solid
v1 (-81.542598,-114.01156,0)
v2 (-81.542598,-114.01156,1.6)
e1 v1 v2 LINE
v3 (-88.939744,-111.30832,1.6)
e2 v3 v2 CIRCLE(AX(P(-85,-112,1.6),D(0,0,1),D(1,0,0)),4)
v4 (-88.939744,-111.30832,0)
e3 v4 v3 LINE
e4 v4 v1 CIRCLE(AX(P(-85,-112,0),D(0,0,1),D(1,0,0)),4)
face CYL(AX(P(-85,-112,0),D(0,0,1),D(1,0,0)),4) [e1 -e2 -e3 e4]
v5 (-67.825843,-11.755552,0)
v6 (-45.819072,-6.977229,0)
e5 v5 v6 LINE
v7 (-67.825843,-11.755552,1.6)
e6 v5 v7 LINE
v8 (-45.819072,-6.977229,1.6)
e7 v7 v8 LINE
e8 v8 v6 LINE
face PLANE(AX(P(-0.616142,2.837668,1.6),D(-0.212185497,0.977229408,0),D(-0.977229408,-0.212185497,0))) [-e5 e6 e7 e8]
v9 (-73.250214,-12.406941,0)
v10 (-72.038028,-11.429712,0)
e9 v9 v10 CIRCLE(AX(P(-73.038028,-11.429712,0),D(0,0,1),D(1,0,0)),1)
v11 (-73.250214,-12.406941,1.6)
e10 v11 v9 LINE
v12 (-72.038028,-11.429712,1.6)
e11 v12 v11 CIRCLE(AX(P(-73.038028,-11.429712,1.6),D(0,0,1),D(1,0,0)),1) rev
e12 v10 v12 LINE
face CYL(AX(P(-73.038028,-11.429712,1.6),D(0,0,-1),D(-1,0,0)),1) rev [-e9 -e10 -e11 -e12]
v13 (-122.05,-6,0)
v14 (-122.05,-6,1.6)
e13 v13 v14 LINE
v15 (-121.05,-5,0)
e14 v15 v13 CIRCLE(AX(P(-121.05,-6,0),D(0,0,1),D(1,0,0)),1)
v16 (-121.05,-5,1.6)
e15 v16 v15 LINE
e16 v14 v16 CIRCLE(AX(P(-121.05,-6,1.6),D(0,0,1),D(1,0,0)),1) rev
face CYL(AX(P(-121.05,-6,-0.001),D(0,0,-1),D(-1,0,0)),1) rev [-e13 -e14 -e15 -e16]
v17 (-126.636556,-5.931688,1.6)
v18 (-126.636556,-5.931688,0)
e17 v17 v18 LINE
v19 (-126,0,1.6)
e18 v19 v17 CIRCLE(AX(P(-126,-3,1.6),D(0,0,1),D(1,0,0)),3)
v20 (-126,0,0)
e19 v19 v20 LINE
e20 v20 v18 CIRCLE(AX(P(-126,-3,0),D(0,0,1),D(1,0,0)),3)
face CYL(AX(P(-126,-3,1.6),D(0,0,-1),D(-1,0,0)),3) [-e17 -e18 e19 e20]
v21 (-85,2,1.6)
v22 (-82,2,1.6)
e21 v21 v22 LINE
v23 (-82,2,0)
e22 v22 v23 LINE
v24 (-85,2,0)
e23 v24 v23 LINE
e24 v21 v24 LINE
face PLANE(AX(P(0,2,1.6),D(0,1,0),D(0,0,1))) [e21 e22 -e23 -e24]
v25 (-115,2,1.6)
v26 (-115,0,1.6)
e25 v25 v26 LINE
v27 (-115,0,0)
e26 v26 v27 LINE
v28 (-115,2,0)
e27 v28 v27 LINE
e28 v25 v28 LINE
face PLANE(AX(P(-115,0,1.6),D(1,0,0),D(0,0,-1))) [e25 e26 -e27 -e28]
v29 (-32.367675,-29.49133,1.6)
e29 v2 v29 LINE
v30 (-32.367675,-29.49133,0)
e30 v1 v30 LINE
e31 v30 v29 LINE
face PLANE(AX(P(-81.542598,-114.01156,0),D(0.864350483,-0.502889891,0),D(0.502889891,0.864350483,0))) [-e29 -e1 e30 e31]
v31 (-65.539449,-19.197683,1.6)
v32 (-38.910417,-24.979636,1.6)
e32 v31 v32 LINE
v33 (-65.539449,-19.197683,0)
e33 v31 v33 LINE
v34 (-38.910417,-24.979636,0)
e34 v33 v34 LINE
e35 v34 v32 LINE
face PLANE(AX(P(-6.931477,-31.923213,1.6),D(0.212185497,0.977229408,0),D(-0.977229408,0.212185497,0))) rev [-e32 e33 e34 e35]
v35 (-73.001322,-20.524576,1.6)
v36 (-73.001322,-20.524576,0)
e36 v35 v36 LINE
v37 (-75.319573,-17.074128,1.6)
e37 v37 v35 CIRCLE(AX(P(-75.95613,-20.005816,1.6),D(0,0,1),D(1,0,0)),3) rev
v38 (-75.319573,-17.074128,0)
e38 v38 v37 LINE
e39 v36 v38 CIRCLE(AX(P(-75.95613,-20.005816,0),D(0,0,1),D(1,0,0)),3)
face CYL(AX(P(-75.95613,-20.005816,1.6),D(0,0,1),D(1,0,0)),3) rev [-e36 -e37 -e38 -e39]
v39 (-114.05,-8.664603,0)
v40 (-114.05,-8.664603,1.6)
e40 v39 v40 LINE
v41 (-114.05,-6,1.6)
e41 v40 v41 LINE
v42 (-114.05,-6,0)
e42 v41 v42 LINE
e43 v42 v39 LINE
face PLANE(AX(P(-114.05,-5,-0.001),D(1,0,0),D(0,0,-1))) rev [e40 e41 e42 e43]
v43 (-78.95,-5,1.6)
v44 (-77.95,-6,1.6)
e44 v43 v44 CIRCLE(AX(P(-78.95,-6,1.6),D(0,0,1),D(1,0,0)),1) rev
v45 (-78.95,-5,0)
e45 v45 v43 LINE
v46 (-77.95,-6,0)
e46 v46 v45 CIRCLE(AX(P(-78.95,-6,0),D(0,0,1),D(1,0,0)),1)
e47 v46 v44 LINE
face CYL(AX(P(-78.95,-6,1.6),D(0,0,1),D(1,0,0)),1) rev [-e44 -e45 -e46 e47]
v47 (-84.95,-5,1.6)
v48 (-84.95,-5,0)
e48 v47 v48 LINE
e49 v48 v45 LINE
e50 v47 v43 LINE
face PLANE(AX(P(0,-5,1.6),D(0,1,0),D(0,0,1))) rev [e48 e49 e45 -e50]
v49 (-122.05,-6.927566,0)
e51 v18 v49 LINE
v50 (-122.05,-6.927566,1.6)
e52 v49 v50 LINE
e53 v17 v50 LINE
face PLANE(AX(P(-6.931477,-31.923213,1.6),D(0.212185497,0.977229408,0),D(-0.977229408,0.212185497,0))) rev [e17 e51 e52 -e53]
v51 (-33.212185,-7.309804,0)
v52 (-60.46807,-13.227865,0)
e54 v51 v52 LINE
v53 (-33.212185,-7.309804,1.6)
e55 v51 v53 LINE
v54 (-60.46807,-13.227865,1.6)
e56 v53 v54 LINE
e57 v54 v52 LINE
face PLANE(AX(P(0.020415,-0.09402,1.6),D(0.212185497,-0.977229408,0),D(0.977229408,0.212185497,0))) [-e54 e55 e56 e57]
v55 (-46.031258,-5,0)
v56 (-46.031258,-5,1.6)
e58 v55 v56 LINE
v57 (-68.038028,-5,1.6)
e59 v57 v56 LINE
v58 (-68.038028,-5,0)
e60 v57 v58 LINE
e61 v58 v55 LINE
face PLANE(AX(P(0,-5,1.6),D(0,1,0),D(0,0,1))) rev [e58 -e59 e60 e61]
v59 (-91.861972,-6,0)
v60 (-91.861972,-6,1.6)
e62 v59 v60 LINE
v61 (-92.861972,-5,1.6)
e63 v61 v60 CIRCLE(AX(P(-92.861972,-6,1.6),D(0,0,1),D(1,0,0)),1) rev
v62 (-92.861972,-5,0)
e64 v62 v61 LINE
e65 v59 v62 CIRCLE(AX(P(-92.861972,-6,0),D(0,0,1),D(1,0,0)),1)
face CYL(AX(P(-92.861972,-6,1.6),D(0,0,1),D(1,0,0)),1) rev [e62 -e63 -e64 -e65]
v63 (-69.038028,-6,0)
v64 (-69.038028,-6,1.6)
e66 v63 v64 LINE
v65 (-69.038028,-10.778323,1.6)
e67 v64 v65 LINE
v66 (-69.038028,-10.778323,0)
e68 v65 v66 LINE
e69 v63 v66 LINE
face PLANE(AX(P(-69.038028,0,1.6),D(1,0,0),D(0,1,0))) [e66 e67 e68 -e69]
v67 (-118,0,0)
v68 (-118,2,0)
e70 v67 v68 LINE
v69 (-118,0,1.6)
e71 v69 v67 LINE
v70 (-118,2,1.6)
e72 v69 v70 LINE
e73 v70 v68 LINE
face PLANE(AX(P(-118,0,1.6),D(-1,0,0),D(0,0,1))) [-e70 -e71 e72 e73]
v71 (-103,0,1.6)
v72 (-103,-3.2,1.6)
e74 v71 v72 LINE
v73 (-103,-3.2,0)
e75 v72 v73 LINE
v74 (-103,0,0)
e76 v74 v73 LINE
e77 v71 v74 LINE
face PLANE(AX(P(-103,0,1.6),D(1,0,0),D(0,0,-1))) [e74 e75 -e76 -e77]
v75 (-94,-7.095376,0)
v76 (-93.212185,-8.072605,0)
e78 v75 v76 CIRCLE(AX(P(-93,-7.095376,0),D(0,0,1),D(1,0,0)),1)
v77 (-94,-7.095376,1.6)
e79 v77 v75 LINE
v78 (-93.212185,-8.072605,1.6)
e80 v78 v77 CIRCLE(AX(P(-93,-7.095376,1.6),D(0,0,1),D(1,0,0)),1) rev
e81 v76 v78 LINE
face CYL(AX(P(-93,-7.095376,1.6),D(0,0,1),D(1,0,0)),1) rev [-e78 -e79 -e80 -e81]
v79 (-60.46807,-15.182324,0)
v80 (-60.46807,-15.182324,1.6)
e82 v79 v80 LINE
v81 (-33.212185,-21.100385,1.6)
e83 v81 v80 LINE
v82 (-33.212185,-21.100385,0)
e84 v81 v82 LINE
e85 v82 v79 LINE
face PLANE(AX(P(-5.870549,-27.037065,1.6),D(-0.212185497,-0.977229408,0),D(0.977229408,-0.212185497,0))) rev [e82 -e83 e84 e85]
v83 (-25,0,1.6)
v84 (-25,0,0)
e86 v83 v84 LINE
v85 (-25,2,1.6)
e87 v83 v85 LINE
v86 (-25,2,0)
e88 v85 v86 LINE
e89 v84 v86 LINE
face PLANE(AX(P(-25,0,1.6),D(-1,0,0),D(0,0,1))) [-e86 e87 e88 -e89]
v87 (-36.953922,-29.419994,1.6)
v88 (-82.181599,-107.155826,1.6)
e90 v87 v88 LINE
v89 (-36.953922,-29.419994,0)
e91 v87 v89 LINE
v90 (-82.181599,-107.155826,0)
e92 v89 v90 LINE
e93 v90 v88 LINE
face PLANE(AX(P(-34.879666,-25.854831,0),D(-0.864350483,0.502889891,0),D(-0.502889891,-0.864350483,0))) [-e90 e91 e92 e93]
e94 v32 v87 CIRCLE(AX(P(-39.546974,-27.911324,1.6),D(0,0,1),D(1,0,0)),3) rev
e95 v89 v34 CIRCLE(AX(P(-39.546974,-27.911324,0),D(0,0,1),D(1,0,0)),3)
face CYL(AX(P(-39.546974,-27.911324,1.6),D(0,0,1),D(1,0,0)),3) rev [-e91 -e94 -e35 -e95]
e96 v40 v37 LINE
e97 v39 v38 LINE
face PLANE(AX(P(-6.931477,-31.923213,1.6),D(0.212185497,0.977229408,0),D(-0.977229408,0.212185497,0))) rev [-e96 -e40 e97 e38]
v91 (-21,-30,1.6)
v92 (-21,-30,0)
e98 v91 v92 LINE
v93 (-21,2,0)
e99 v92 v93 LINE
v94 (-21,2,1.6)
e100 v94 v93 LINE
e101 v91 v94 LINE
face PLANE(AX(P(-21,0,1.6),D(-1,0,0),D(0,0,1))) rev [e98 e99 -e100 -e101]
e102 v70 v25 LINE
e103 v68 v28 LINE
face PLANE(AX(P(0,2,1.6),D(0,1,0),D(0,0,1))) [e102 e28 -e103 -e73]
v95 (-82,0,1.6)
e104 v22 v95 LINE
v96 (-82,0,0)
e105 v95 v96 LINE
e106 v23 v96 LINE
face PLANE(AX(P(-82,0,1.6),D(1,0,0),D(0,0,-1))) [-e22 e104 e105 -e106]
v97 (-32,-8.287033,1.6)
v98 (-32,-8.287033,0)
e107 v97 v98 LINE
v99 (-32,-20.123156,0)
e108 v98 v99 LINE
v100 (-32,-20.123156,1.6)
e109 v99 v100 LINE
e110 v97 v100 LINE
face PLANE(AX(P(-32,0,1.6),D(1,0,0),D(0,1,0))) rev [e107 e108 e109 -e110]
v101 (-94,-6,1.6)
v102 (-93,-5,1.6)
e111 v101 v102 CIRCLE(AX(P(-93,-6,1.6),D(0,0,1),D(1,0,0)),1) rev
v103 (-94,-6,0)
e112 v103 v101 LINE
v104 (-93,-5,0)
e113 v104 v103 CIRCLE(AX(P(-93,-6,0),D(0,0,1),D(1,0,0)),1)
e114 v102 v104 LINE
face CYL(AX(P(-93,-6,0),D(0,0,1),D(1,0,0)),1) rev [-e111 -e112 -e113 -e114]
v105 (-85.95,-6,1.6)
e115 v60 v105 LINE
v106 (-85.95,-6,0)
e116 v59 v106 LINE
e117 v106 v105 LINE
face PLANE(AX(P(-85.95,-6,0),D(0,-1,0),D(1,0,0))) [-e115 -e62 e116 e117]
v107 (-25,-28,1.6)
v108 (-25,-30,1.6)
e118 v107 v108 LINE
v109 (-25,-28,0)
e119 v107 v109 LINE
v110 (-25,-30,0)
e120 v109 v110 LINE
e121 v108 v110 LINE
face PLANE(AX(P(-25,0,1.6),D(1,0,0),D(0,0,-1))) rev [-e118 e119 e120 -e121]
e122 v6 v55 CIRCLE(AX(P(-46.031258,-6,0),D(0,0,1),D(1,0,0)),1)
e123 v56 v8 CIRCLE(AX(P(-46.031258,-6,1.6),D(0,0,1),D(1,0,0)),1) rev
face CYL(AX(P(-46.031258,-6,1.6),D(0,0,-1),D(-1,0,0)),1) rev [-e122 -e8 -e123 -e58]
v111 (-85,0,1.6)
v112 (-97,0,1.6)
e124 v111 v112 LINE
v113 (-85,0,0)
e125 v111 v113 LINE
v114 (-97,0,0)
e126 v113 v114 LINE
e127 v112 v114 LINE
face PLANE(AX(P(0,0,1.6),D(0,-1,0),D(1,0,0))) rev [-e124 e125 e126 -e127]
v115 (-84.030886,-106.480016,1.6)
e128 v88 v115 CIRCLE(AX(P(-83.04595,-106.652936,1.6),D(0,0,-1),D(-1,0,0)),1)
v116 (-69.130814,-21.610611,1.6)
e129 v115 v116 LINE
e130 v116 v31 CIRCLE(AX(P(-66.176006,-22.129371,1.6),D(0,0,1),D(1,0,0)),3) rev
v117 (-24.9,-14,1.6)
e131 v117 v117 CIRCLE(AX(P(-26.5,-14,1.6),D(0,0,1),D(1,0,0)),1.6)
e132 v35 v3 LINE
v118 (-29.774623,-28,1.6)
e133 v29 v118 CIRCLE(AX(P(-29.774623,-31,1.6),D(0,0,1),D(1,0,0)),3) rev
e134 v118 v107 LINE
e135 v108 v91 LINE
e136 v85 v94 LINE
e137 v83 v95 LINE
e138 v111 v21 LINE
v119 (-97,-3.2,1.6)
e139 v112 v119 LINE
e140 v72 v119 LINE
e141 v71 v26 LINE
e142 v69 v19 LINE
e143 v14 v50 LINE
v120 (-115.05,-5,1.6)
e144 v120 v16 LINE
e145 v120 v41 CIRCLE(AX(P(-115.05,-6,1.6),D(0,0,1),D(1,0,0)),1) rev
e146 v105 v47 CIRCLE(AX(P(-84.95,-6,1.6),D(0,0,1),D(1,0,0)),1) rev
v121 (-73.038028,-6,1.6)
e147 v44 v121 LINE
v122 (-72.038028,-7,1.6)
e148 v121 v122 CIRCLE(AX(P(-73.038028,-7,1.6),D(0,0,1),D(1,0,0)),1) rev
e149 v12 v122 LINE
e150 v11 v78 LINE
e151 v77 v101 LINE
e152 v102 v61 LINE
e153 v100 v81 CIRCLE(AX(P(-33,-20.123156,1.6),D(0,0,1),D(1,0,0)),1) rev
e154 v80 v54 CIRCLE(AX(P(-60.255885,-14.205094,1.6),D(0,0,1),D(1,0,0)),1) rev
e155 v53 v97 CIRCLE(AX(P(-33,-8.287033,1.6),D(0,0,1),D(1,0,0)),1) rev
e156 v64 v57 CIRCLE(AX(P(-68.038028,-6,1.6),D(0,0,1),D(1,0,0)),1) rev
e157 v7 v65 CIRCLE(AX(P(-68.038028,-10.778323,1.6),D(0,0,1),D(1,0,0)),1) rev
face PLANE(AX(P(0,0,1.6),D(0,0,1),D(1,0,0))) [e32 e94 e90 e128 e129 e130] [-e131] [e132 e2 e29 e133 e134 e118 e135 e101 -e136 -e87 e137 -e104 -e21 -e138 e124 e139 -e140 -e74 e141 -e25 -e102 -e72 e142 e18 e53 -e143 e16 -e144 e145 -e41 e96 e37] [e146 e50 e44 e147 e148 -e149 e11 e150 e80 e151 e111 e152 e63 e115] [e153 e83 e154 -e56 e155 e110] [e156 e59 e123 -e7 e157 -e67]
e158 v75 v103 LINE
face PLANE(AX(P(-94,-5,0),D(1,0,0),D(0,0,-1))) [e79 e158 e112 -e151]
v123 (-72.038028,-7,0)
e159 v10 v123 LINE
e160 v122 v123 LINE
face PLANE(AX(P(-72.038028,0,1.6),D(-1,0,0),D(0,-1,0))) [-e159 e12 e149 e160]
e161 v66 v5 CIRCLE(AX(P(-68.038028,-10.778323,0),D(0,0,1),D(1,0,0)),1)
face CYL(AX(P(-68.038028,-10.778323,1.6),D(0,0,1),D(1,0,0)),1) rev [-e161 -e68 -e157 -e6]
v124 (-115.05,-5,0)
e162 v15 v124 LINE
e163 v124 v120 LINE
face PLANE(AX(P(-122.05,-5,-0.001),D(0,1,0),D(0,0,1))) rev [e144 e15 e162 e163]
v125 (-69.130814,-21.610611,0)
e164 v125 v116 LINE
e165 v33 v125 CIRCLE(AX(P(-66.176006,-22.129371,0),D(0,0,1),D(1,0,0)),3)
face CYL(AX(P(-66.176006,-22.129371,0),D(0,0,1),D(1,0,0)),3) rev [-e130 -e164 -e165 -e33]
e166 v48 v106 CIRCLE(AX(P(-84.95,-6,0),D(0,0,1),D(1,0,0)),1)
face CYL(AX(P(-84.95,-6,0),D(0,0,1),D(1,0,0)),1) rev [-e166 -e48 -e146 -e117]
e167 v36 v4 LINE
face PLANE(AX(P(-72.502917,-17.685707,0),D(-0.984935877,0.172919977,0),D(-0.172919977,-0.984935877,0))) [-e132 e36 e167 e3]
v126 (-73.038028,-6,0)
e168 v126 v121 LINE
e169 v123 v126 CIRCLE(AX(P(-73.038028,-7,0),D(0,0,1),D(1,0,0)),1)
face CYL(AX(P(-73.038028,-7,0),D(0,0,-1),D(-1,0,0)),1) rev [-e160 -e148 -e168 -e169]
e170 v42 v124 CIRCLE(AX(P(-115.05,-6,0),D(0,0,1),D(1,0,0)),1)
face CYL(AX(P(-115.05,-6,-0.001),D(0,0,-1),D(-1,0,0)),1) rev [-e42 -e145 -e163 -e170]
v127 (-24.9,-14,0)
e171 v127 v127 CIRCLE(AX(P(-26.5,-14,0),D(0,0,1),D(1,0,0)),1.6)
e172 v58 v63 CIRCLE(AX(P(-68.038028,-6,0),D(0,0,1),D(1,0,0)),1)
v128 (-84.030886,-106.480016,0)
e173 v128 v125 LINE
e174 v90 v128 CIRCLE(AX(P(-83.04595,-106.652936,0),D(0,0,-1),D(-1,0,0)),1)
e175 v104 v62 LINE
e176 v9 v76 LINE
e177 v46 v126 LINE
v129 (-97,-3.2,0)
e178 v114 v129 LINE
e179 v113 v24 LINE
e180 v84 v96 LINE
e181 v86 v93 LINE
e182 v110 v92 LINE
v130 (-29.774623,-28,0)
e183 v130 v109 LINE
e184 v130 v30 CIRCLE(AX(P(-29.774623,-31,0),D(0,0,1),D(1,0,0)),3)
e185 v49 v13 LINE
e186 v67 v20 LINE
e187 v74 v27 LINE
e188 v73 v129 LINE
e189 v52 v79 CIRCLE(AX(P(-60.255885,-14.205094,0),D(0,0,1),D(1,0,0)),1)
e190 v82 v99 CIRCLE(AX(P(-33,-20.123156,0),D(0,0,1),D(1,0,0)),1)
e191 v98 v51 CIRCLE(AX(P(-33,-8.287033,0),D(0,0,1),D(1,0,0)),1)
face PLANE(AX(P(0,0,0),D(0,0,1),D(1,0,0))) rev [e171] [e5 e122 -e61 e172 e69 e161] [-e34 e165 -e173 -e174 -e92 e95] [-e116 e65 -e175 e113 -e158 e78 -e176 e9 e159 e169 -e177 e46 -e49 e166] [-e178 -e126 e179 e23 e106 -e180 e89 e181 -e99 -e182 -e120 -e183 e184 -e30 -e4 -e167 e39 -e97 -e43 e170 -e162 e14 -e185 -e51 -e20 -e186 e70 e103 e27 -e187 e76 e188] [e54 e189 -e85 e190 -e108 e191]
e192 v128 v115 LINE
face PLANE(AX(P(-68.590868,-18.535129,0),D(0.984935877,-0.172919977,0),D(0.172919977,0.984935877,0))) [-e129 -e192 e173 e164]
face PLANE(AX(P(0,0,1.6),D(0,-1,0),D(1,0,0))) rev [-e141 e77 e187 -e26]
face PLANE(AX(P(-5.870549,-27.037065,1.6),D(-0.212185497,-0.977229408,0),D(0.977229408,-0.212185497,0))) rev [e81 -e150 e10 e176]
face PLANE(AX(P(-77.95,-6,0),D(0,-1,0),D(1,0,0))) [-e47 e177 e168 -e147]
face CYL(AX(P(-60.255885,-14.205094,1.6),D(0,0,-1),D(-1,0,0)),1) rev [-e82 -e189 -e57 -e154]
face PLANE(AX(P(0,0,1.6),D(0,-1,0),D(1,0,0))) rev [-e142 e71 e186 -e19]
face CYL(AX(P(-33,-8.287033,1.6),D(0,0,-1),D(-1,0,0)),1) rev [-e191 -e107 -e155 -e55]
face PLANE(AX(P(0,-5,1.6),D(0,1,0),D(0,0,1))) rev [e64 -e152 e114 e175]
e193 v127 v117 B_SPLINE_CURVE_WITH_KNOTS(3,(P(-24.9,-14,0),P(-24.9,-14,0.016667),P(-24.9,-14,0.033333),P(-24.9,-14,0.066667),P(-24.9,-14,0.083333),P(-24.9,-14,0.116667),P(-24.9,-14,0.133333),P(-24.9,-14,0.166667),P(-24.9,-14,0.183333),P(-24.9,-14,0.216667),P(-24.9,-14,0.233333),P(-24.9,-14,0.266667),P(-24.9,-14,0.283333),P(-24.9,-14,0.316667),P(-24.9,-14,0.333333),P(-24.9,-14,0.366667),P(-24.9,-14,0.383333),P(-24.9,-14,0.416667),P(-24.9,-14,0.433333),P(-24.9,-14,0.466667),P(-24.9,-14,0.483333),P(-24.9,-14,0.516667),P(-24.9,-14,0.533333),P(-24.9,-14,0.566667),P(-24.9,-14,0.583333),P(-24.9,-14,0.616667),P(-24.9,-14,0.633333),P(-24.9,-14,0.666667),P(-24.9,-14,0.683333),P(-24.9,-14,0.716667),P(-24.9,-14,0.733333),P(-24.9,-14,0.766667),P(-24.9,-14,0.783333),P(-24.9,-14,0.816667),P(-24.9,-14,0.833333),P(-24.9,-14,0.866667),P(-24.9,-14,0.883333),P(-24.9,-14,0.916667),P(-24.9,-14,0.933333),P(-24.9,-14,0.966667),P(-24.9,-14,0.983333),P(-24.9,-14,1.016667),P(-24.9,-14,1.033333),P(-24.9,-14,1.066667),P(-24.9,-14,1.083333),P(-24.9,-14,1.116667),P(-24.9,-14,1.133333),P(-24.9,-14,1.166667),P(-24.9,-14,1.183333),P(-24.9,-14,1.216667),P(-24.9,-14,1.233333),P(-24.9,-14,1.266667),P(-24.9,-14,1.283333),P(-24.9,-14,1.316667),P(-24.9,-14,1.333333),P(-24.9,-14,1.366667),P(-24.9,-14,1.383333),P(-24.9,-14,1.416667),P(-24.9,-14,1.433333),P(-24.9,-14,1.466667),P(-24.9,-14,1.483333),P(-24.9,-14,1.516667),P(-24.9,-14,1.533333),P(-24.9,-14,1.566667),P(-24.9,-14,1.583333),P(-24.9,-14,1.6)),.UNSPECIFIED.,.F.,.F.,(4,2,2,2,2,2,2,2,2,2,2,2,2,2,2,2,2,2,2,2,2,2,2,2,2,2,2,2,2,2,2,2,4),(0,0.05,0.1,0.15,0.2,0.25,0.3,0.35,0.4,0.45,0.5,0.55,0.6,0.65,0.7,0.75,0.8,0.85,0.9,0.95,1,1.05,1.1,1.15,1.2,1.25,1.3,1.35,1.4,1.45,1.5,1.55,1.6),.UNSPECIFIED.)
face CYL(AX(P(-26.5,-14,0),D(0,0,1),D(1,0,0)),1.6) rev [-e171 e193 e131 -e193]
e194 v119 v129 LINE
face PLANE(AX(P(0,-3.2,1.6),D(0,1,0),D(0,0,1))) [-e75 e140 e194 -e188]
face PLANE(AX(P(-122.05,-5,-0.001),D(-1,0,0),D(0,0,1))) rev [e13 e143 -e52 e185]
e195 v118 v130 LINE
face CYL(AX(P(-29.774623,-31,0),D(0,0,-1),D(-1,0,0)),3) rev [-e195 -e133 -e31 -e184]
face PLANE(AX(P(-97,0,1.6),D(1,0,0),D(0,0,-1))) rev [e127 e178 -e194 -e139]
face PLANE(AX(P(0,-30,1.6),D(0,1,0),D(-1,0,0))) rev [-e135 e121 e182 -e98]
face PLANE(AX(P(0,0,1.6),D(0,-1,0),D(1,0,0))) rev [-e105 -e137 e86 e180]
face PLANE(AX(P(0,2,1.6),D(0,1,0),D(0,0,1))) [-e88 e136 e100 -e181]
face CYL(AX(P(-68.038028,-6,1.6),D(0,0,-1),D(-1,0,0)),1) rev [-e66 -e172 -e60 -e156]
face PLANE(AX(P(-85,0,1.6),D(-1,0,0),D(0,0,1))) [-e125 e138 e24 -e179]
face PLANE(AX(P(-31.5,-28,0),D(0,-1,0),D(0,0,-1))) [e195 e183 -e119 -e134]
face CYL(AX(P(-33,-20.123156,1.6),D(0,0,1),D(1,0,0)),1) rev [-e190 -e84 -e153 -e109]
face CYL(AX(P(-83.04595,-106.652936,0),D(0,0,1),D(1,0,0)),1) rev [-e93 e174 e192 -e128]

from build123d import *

# Parameters (mm, degrees)
BOSS_EXTRUDE1_DEPTH = 1.6
CUT_EXTRUDE1_REACH  = 134.452
SKETCH3_W           = 5.911971619
SKETCH3_H           = 1
BOSS_EXTRUDE2_DEPTH = 1.6
BOSS_EXTRUDE3_DEPTH = 1.6
FILLET2_R           = 1
SKETCH6_R           = 1.6
CUT_EXTRUDE2_DEPTH  = 133.452104551
BOSS_EXTRUDE4_DEPTH = 1.6
FILLET3_R           = 3


with BuildPart() as part:
    # Sketch1 → Boss-Extrude1 (new body)
    with BuildSketch(Plane.XY):
        with BuildLine():
            Line((-25, 2), (-25, 0))
            Line((-25, 0), (-82, 0))
            Line((-82, 0), (-82, 2))
            Line((-82, 2), (-85, 2))
            Line((-85, 2), (-85, 0))
            Line((-85, 0), (-97, 0))
            Line((-97, 0), (-97, -3.2))
            Line((-97, -3.2), (-103, -3.2))
            Line((-103, -3.2), (-103, 0))
            Line((-103, 0), (-115, 0))
            Line((-115, 0), (-115, 2))
            Line((-115, 2), (-118, 2))
            Line((-118, 2), (-118, 0))
            Line((-118, 0), (-126, 0))
            ThreePointArc((-126, 0), (-128.982873168, -2.679894289), (-126.636556491, -5.931688223))
            Line((-126.636556491, -5.931688223), (-25, -28))
            Line((-25, -28), (-25, -30))
            Line((-25, -30), (-21, -30))
            Line((-21, -30), (-21, 2))
            Line((-21, 2), (-25, 2))
        make_face()
        Polygon((-32, -21.363586453), (-64.968742205, -14.205094401), (-32, -7.046602348), align=None, mode=Mode.SUBTRACT)
        Polygon((-69.038028381, -5), (-36.712857451, -5), (-69.038028381, -12.018753635), align=None, mode=Mode.SUBTRACT)
        Polygon((-72.038028381, -5), (-72.038028381, -12.67014264), (-107.363199311, -5), align=None, mode=Mode.SUBTRACT)
    extrude(amount=BOSS_EXTRUDE1_DEPTH)

    # Sketch2 → Cut-Extrude1 (cut, up to next)
    with BuildSketch(Plane.XY.offset(1.6), mode=Mode.PRIVATE) as cut_extrude1_sk1:
        Polygon((-122.05, -5), (-114.05, -5), (-114.05, -8.664603056), (-122.05, -6.927565711), align=None)
    cut_extrude1_tool1 = extrude(cut_extrude1_sk1.sketch, amount=-CUT_EXTRUDE1_REACH, mode=Mode.PRIVATE) & part.part
    add(cut_extrude1_tool1.solids().sort_by_distance((-117.635841, -6.443005, 1.6))[0], mode=Mode.SUBTRACT)

    # Sketch3 → Boss-Extrude2 (add)
    with BuildSketch(Plane.XY.offset(1.6)):
        with Locations((-74.99401419, -5.5)):
            Rectangle(SKETCH3_W, SKETCH3_H)
        with Locations((-88.90598581, -5.5)):
            Rectangle(SKETCH3_W, SKETCH3_H)
    extrude(amount=-BOSS_EXTRUDE2_DEPTH)

    # Sketch4 → Boss-Extrude3 (add)
    with BuildSketch(Plane.XY.offset(1.6)):
        Polygon((-107.363199311, -5), (-94, -5), (-94, -7.901547031), align=None)
    extrude(amount=-BOSS_EXTRUDE3_DEPTH)

    # Fillet2
    fillet2_edges = [part.edges().sort_by_distance(p)[0] for p in [
        (-64.968742205, -14.205094401, 0.8),
        (-69.038028381, -12.018753635, 0.8),
        (-72.038028381, -12.67014264, 0.8),
        (-69.038028381, -5, 0.8),
        (-36.712857451, -5, 0.8),
        (-32, -7.046602348, 0.8),
        (-32, -21.363586453, 0.8),
        (-122.05, -5, 0.8),
        (-114.05, -5, 0.8),
        (-85.95, -5, 0.8),
        (-77.95, -5, 0.8),
        (-72.038028381, -6, 0.8),
        (-91.861971619, -5, 0.8),
        (-94, -7.901547031, 0.8),
        (-94, -5, 0.8),
    ]]
    fillet(fillet2_edges, radius=FILLET2_R - 0.0001)  # a hair under: the kernel refuses the full size

    # Sketch6 → Cut-Extrude2 (cut, through all)
    with BuildSketch(Plane.XY.offset(1.6)):
        with Locations((-26.5, -14)):
            Circle(SKETCH6_R)
    extrude(amount=-CUT_EXTRUDE2_DEPTH, mode=Mode.SUBTRACT)

    # Sketch5 → Boss-Extrude4 (add)
    with BuildSketch(Plane.XY.offset(1.6)):
        with BuildLine():
            Line((-72.502917062, -17.685707385), (-88.939743507, -111.308320091))
            ThreePointArc((-88.939743507, -111.308320091), (-86.37296732, -115.756988254), (-81.542598068, -114.011559564))
            Line((-81.542598068, -114.011559564), (-31.5, -28))
            Line((-31.5, -28), (-25, -28))
            Line((-25, -28), (-34.87966647, -25.854831299))
            Line((-34.87966647, -25.854831299), (-82.18159936, -107.155826358))
            ThreePointArc((-82.18159936, -107.155826358), (-83.389191673, -107.59218353), (-84.03088572, -106.48001649))
            Line((-84.03088572, -106.48001649), (-68.590867503, -18.535129407))
            Line((-68.590867503, -18.535129407), (-72.502917062, -17.685707385))
        make_face()
    extrude(amount=-BOSS_EXTRUDE4_DEPTH)

    # Fillet3
    fillet3_edges = [part.edges().sort_by_distance(p)[0] for p in [
        (-72.502917062, -17.685707385, 0.8),
        (-68.590867503, -18.535129407, 0.8),
        (-34.87966647, -25.854831299, 0.8),
        (-31.5, -28, 0.8),
    ]]
    fillet(fillet3_edges, radius=FILLET3_R)


solid = part.part
